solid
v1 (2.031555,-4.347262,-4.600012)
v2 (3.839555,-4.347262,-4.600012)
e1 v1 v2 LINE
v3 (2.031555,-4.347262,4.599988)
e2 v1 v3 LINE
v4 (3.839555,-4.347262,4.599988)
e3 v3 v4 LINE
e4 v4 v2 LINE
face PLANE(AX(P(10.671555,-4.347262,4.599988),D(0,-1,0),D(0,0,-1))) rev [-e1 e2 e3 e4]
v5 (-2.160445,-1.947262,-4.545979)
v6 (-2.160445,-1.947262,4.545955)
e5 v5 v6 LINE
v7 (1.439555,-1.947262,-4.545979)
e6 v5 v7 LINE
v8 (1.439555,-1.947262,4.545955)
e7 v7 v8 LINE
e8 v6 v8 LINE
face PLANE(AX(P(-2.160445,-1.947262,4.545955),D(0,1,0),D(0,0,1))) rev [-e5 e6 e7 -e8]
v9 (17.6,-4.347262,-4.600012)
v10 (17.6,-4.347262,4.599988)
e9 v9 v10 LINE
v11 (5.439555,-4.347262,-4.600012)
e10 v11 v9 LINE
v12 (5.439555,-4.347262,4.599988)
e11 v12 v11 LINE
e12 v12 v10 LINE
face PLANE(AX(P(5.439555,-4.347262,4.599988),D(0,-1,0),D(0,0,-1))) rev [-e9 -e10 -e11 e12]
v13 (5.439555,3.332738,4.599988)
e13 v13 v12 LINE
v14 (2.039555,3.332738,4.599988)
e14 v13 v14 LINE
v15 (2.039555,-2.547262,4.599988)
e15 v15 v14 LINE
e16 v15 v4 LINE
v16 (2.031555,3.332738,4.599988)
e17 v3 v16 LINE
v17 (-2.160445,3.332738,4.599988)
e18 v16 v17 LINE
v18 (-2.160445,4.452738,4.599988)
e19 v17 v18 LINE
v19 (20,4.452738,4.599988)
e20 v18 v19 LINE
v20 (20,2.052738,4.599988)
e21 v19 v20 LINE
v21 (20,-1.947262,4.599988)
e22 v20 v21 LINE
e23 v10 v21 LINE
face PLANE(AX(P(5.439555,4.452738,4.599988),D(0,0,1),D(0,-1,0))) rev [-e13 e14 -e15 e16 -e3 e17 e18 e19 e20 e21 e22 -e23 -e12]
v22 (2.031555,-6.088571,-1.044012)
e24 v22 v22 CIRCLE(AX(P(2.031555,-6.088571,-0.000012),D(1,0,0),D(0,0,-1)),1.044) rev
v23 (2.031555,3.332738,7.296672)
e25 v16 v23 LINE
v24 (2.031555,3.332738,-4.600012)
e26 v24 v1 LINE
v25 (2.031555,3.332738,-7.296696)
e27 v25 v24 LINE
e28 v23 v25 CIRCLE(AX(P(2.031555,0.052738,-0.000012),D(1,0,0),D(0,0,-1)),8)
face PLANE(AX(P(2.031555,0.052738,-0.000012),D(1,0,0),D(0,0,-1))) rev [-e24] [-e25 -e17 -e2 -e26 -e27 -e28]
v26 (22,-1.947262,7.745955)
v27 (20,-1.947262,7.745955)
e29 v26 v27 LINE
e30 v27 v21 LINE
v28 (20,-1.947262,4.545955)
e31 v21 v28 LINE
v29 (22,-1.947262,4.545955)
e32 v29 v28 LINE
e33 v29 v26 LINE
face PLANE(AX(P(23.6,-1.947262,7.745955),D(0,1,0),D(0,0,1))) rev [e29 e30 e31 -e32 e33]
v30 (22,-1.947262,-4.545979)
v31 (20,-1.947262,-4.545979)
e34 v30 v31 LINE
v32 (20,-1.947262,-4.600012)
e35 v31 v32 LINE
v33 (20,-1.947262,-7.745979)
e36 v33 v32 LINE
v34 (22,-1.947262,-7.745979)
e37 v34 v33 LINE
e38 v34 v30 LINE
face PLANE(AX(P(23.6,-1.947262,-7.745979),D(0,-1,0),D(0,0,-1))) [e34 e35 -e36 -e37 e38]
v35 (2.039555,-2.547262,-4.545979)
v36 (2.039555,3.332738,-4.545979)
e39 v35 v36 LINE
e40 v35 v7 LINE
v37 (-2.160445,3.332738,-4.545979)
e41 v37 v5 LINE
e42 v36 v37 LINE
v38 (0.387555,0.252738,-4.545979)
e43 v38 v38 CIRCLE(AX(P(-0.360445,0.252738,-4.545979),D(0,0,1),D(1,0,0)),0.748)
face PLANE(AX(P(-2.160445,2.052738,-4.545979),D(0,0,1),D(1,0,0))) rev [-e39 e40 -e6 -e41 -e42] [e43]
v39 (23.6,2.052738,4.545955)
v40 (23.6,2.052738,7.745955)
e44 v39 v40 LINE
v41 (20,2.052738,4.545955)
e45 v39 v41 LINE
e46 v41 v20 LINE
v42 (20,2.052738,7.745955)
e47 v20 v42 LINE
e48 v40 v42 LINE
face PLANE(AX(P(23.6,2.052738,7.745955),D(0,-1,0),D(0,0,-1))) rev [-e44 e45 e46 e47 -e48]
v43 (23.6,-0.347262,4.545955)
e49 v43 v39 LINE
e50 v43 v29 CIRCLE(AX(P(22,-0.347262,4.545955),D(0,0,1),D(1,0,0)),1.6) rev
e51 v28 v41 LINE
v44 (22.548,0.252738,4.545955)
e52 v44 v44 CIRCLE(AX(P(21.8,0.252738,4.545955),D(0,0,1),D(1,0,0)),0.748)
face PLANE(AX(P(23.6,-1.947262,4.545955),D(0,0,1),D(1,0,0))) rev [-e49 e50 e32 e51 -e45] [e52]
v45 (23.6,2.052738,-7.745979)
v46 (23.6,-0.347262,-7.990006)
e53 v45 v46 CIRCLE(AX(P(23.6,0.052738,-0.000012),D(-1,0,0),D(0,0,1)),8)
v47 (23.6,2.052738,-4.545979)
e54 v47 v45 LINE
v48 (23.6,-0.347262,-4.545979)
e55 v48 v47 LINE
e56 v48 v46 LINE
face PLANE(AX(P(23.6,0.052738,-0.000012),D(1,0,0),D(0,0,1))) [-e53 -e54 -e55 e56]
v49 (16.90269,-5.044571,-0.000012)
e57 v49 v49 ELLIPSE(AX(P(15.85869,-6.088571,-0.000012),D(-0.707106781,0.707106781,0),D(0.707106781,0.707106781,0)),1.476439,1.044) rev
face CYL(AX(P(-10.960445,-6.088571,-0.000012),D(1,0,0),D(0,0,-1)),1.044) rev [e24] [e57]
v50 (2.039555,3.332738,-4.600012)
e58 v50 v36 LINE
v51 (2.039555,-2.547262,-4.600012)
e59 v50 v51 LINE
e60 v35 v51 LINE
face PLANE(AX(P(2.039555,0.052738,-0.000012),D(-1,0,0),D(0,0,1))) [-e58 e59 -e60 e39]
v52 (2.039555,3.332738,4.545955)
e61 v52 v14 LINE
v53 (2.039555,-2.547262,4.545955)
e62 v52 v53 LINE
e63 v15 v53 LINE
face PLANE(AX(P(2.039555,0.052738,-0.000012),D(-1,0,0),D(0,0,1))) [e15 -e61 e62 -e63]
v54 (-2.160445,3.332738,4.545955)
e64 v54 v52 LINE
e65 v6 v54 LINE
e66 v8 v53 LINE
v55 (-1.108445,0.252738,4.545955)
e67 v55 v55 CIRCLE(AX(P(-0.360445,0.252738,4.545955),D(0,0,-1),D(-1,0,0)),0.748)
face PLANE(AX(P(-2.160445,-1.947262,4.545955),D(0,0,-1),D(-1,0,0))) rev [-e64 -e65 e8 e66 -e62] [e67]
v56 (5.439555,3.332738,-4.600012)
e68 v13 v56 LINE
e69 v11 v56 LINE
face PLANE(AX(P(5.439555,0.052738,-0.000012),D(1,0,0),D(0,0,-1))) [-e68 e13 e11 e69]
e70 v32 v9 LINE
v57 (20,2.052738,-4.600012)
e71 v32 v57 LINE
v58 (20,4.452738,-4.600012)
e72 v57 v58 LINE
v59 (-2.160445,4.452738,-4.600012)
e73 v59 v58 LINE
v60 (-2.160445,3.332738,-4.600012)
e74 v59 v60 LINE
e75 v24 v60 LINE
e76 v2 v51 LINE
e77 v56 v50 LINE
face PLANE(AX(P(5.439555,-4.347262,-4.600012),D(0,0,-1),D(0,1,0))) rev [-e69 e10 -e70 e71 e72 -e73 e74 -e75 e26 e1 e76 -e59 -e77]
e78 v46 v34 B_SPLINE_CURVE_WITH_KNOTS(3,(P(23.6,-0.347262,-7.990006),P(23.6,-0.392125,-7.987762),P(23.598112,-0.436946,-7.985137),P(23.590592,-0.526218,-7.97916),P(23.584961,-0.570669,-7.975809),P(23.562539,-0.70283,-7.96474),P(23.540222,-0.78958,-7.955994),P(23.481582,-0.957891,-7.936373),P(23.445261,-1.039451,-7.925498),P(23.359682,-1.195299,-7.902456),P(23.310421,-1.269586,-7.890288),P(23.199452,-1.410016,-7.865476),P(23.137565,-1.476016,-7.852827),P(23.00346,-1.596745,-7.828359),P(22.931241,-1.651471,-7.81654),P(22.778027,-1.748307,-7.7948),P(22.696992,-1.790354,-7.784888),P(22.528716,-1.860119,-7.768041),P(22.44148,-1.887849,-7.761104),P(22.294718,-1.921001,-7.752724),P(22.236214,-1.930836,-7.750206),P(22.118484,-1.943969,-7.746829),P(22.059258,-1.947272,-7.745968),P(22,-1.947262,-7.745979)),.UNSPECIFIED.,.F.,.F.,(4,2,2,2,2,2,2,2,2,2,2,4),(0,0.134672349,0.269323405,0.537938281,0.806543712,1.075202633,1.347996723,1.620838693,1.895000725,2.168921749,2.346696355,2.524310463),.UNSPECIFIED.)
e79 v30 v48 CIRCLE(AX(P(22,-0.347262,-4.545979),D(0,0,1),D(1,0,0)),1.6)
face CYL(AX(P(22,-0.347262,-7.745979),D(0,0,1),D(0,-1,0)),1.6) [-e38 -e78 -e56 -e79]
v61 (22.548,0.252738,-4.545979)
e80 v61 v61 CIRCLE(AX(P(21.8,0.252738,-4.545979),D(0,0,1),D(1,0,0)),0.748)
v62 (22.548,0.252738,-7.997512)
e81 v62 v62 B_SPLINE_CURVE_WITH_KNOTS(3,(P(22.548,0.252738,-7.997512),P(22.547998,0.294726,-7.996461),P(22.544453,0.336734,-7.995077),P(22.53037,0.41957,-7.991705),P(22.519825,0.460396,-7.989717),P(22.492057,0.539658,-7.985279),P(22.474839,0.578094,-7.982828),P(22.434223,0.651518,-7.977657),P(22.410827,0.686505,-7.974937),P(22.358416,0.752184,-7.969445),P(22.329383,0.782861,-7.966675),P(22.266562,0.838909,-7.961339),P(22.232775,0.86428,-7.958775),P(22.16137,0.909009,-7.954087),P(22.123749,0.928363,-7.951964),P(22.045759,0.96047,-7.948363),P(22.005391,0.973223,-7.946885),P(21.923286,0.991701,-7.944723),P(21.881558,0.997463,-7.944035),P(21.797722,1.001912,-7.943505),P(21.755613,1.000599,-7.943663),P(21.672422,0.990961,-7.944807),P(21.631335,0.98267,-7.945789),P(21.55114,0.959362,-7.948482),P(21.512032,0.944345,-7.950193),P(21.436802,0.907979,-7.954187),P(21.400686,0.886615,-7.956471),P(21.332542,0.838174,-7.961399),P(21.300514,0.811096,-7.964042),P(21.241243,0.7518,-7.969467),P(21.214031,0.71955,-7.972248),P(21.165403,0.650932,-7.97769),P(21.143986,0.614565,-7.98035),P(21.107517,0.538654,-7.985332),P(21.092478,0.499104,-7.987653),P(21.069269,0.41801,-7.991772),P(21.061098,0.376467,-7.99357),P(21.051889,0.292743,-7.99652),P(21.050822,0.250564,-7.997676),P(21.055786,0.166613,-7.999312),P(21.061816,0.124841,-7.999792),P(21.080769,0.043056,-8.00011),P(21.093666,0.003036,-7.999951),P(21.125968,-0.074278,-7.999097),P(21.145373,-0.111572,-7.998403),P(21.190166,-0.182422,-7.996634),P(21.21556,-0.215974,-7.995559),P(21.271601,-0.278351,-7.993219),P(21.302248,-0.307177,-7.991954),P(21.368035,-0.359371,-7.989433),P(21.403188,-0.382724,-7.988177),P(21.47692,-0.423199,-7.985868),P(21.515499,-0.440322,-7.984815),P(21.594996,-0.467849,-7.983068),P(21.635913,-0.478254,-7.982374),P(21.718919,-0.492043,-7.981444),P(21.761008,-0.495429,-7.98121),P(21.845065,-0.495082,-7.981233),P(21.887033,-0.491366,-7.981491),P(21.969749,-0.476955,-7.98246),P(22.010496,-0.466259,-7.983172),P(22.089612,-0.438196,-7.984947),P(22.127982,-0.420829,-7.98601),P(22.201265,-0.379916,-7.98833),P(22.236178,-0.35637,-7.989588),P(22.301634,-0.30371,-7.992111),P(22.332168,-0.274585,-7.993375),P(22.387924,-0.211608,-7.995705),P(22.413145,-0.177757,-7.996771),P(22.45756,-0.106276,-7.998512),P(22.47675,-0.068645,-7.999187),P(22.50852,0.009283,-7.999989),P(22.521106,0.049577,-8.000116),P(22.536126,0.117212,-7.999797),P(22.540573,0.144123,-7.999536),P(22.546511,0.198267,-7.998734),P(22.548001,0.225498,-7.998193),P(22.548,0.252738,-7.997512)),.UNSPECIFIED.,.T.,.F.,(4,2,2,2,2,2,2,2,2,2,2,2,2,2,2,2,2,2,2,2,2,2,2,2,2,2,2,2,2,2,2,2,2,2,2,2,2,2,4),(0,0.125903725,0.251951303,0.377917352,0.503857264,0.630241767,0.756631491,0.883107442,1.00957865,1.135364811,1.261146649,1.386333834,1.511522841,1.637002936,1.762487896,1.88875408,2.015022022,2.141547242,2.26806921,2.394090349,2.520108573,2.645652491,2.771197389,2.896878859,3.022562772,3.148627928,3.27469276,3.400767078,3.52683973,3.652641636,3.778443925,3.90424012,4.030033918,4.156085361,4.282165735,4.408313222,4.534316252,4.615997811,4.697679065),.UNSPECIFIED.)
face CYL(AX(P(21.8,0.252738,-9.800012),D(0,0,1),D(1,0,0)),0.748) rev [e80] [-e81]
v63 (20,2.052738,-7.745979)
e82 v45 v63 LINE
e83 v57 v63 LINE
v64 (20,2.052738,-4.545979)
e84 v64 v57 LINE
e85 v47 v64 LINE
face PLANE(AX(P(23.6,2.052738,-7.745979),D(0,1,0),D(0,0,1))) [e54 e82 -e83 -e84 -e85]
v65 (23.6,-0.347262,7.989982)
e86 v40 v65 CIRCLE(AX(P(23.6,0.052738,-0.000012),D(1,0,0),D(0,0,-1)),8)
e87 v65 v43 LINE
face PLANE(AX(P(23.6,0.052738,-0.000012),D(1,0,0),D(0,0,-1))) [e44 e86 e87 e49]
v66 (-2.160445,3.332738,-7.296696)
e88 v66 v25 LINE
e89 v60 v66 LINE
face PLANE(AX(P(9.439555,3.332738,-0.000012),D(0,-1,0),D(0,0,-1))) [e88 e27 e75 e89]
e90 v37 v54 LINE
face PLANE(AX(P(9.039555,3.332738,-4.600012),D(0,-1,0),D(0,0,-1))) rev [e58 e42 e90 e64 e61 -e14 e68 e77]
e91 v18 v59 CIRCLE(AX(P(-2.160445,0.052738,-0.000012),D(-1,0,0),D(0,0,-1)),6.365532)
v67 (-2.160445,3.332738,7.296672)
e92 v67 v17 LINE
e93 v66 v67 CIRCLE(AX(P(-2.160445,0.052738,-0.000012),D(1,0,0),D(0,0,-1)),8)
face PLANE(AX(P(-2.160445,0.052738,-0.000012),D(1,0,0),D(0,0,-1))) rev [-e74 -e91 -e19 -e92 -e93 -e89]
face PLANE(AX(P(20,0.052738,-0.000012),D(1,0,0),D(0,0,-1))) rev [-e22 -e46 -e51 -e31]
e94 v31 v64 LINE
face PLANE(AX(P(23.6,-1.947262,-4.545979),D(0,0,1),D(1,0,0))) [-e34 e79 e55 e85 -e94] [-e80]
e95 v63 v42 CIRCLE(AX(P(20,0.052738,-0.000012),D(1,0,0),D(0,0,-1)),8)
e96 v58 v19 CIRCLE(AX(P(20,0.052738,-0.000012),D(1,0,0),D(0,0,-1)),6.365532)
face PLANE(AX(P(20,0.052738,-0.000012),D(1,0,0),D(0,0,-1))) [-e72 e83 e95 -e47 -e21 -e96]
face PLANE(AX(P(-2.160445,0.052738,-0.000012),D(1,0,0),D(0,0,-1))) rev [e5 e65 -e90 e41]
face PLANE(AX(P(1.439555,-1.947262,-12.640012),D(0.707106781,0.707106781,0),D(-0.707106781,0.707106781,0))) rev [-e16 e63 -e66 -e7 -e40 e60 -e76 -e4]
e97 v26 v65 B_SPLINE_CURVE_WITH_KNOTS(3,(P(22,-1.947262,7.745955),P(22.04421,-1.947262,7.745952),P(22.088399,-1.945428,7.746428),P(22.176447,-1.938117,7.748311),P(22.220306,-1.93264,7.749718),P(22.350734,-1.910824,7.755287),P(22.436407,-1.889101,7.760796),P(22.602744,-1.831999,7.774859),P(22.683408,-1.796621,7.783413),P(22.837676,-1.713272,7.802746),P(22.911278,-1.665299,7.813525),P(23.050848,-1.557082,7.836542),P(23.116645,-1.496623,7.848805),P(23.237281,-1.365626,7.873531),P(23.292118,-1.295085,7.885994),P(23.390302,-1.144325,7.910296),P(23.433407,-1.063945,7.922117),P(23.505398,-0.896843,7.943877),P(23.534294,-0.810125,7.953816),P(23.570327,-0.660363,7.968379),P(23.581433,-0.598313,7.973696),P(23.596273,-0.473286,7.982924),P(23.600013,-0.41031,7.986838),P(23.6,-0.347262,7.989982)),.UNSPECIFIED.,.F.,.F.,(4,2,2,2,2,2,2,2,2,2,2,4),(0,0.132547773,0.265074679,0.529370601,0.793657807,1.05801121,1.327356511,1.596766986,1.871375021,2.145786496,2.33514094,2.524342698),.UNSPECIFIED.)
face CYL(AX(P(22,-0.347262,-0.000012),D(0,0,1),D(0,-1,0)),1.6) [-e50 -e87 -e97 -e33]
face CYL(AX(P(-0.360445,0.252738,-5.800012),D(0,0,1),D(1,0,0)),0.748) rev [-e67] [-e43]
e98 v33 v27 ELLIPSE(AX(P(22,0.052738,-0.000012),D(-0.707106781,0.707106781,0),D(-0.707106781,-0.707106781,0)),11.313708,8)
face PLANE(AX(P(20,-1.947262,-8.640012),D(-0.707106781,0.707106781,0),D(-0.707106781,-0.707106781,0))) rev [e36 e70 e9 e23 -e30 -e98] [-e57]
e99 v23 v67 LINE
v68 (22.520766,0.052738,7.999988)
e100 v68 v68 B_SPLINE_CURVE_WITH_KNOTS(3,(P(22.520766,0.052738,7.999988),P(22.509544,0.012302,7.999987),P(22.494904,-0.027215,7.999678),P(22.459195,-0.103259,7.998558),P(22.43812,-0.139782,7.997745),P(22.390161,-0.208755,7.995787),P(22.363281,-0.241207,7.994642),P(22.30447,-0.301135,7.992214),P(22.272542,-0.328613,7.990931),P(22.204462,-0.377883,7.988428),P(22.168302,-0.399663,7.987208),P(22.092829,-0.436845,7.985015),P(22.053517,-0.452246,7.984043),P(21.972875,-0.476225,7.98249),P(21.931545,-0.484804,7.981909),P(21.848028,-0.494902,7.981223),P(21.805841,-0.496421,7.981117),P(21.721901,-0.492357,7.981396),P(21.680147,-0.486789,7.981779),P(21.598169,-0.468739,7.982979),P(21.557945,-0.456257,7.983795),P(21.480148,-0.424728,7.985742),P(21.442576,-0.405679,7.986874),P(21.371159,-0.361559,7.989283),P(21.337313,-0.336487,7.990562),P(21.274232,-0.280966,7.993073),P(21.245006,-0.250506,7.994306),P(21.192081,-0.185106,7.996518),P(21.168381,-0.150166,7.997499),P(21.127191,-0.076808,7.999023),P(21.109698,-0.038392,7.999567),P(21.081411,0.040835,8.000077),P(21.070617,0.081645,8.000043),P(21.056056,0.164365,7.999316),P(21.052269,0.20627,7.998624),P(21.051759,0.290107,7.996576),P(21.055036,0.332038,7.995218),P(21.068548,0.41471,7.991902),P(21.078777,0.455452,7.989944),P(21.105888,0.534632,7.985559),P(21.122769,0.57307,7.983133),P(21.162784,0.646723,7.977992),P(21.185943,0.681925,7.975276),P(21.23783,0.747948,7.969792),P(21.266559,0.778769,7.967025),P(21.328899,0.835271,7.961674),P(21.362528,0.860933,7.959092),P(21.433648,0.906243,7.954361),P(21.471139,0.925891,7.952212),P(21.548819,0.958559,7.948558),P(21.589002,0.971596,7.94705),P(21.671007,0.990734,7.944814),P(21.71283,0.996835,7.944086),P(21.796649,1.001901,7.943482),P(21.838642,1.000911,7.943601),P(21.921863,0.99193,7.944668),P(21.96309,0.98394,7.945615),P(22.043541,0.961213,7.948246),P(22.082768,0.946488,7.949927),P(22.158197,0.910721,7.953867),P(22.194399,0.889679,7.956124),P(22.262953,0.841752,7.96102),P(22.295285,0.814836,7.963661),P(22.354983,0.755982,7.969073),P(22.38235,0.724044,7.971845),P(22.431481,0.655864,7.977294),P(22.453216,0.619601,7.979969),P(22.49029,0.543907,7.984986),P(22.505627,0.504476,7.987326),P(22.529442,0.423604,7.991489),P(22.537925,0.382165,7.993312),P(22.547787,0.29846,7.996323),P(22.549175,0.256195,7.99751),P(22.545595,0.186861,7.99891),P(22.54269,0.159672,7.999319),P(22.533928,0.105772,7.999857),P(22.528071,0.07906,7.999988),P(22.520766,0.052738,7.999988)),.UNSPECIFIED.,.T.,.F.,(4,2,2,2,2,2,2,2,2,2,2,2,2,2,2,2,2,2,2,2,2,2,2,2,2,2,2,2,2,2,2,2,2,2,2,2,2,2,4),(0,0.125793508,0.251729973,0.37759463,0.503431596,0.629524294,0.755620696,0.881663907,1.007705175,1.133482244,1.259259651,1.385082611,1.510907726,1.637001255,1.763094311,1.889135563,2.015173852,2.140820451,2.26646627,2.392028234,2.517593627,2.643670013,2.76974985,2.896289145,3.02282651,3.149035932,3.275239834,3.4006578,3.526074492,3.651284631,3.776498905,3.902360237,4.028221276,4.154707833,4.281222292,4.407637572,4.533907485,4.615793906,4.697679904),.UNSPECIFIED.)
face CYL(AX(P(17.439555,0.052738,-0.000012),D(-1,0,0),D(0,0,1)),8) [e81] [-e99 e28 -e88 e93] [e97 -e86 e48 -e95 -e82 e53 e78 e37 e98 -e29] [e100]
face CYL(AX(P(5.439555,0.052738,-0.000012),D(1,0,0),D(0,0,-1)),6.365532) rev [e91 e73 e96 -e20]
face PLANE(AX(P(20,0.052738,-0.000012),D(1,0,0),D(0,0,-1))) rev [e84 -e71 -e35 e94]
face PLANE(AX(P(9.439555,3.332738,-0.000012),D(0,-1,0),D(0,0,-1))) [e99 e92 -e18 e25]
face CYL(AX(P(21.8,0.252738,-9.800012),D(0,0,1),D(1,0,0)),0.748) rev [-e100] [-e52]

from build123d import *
from build123d.topology import SkipClean

# Parameters (mm, degrees)
SKETCH1_R           = 10
BOSS_EXTRUDE1_DEPTH = 10
SKETCH4_R           = 1.305
CUT_EXTRUDE3_DEPTH  = 25.5
BOSS_EXTRUDE2_START = 4.5
BOSS_EXTRUDE2_DEPTH = 4.5
SKETCH6_R           = 0.935
CUT_EXTRUDE4_DEPTH  = 12.25
SKETCH7_W           = 11.364916732
SKETCH7_H           = 5
BOSS_EXTRUDE3_DEPTH = 4.5
SKETCH8_R           = 0.935
CUT_EXTRUDE5_DEPTH  = 7.25
BOSS_EXTRUDE4_DEPTH = 4.5
CUT_EXTRUDE6_START  = -0.75
CUT_EXTRUDE6_DEPTH  = 0.75
SKETCH12_W          = 5.25
SKETCH12_H          = 4
CUT_EXTRUDE7_DEPTH  = 1.6
CUT_EXTRUDE8_DEPTH  = 15.8
FILLET1_R           = 2
CUT_EXTRUDE9_DEPTH  = 10.8
SKETCH15_W          = 11.364916732
SKETCH15_H          = 6.6
CUT_EXTRUDE10_DEPTH = 1.6
CUT_EXTRUDE11_DEPTH = 15
BOSS_EXTRUDE5_REACH = 35.438
SKETCH17_R          = 10
SKETCH17_R_2        = 1.305
CUT_EXTRUDE12_DEPTH = 14
SCALE1_SCALE        = 0.8


with BuildPart() as part:
    # Sketch1 → Boss-Extrude1 (new, symmetric)
    with BuildSketch(Plane(origin=(0, 0, 0), x_dir=(0, 0, -1), z_dir=(1, 0, 0))):
        Circle(SKETCH1_R)
    extrude(amount=BOSS_EXTRUDE1_DEPTH, both=True)

    # Sketch4 → Cut-Extrude3 (cut, symmetric)
    with BuildSketch(Plane(origin=(0, -0.76336978, 0), x_dir=(0, 0, -1), z_dir=(1, 0, 0))):
        with Locations((0, -6.913267104)):
            Circle(SKETCH4_R)
    extrude(amount=CUT_EXTRUDE3_DEPTH, both=True, mode=Mode.SUBTRACT)

    # Sketch5 → Boss-Extrude2 (add)
    with BuildSketch(Plane(origin=(10, 0, 0), x_dir=(0, 0, -1), z_dir=(1, 0, 0)).offset(BOSS_EXTRUDE2_START)):
        with BuildLine():
            Line((-9.682458366, -2.5), (-5.682458366, -2.5))
            Line((-5.682458366, -2.5), (-5.682458366, 2.5))
            Line((-5.682458366, 2.5), (-9.682458366, 2.5))
            ThreePointArc((-9.682458366, 2.5), (-10, 0), (-9.682458366, -2.5))
        make_face()
    boss_extrude2 = extrude(amount=-BOSS_EXTRUDE2_DEPTH)

    # Mirror1: Boss-Extrude2 across plane
    add(boss_extrude2.mirror(Plane.XY))

    # Sketch6 → Cut-Extrude4 (cut, symmetric)
    with SkipClean():  # the faces are left unmerged after this step: merging them gives an invalid solid
        with BuildSketch(Plane.XY):
            with Locations((12.25, 0.25)):
                Circle(SKETCH6_R)
        extrude(amount=CUT_EXTRUDE4_DEPTH, both=True, mode=Mode.SUBTRACT)

    # Sketch7 → Boss-Extrude3 (add)
    with SkipClean():  # the faces are left unmerged after this step: merging them gives an invalid solid
        with BuildSketch(Plane.ZY.offset(10)):
            Rectangle(SKETCH7_W, SKETCH7_H)
        extrude(amount=BOSS_EXTRUDE3_DEPTH)

    # Sketch8 → Cut-Extrude5 (cut, symmetric)
    with SkipClean():  # the faces are left unmerged after this step: merging them gives an invalid solid
        with BuildSketch(Plane.XY):
            with Locations((-12.25, 0.25)):
                Circle(SKETCH8_R)
        extrude(amount=CUT_EXTRUDE5_DEPTH, both=True, mode=Mode.SUBTRACT)

    # Sketch10 → Boss-Extrude4 (add)
    with SkipClean():  # the faces are left unmerged after this step: merging them gives an invalid solid
        with BuildSketch(Plane.ZY.offset(10)):
            with BuildLine():
                Line((9.682458366, 2.5), (-9.682458366, 2.5))
                ThreePointArc((-9.682458366, 2.5), (0, 10), (9.682458366, 2.5))
            make_face()
        extrude(amount=BOSS_EXTRUDE4_DEPTH)

    # Cut-Extrude6: read off the stored shape, not the designer's step
    # Cut-Extrude6 outline → Cut-Extrude6 (cut)
    with SkipClean():  # the faces are left unmerged after this step: merging them gives an invalid solid
        with BuildSketch(Plane.ZY.offset(10).offset(CUT_EXTRUDE6_START)):
            with BuildLine():
                ThreePointArc((-9.682458366, 2.5), (-9.369942303, -3.493448331), (-5.682458366, -8.228588392))
                Line((-5.682458366, -8.228588392), (-5.682458366, 2.5))
                Line((-5.682458366, 2.5), (-9.682458366, 2.5))
            make_face()
            with BuildLine():
                Line((5.682458366, 2.5), (5.682458366, -8.228588392))
                ThreePointArc((5.682458366, -8.228588392), (9.369942303, -3.493448331), (9.682458366, 2.5))
                Line((9.682458366, 2.5), (5.682458366, 2.5))
            make_face()
        extrude(amount=CUT_EXTRUDE6_DEPTH, mode=Mode.SUBTRACT)

    # Sketch12 → Cut-Extrude7 (cut)
    with SkipClean():  # the faces are left unmerged after this step: merging them gives an invalid solid
        with BuildSketch(Plane.XZ.offset(-2.5)):
            with Locations((-11.875, -7.682458366)):
                Rectangle(SKETCH12_W, SKETCH12_H)
            with Locations((-11.875, 7.682458366)):
                Rectangle(SKETCH12_W, SKETCH12_H)
        extrude(amount=-CUT_EXTRUDE7_DEPTH, mode=Mode.SUBTRACT)

    # Sketch13 → Cut-Extrude8 (cut, symmetric)
    with SkipClean():  # the faces are left unmerged after this step: merging them gives an invalid solid
        with BuildSketch(Plane.XY):
            Polygon((-10, -8.228588392), (-10, -2.5), (-2.5, -10), (-10, -10), align=None)
        extrude(amount=CUT_EXTRUDE8_DEPTH, both=True, mode=Mode.SUBTRACT)

    # Fillet1
    fillet1_edges = [part.edges().sort_by_distance(p)[0] for p in [
        (14.5, -2.5, 7.682458366),
        (14.5, -2.5, -7.682458366),
    ]]
    fillet(fillet1_edges, radius=FILLET1_R)

    # Sketch14 → Cut-Extrude9 (cut, symmetric)
    with SkipClean():  # the faces are left unmerged after this step: merging them gives an invalid solid
        with BuildSketch(Plane.XY):
            Polygon((10, -10), (10, -2.5), (2.5, -10), align=None)
        extrude(amount=CUT_EXTRUDE9_DEPTH, both=True, mode=Mode.SUBTRACT)

    # Sketch15 → Cut-Extrude10 (cut)
    with SkipClean():  # the faces are left unmerged after this step: merging them gives an invalid solid
        with BuildSketch(Plane(origin=(10, 0, 0), x_dir=(0, 0, -1), z_dir=(1, 0, 0))):
            with Locations((0, -0.8)):
                Rectangle(SKETCH15_W, SKETCH15_H)
        extrude(amount=-CUT_EXTRUDE10_DEPTH, mode=Mode.SUBTRACT)

    # Sketch16 → Cut-Extrude11 (cut)
    with SkipClean():  # the faces are left unmerged after this step: merging them gives an invalid solid
        with BuildSketch(Plane(origin=(10, 0, 0), x_dir=(0, 0, -1), z_dir=(1, 0, 0))):
            with BuildLine():
                Line((-5.75, 5.5), (-5.75, -5.5))
                Line((-5.75, -5.5), (5.75, -5.5))
                Line((5.75, -5.5), (5.75, 5.5))
                ThreePointArc((5.75, 5.5), (0, 7.956915231), (-5.75, 5.5))
            make_face()
        extrude(amount=-CUT_EXTRUDE11_DEPTH, mode=Mode.SUBTRACT)


with BuildPart() as body_2:
    # Split1: the piece on the far side of the plane
    add(part.part)
    split(bisect_by=Plane(origin=(0, 0, 0), x_dir=(0, 0, 1), z_dir=(1, 0, 0)), keep=Keep.BOTTOM)


with BuildPart() as part_1:
    add(part.part)

    # Split1
    split(bisect_by=Plane(origin=(0, 0, 0), x_dir=(0, 0, 1), z_dir=(1, 0, 0)), keep=Keep.TOP)


with BuildPart() as part_2:
    # Body-Move/Copy1: moved
    add(part_1.part.moved(Location((15.8, 0, 0))))


    # Sketch17 → Boss-Extrude5 (add, up to next)
    with BuildSketch(Plane.ZY.offset(-15.8), mode=Mode.PRIVATE) as boss_extrude5_sk1:
        with Locations(Location((0, 0, 0), (0, 0, 357.134016017))):
            Circle(SKETCH17_R)
        with Locations(Location((0, -7.676636884, 0), (0, 0, 180))):
            Circle(SKETCH17_R_2, mode=Mode.SUBTRACT)
        with BuildLine():
            Line((-5.75, -5.5), (5.75, -5.5))
            Line((5.75, -5.5), (5.75, 5.5))
            ThreePointArc((5.75, 5.5), (0, 7.956915231), (-5.75, 5.5))
            Line((-5.75, 5.5), (-5.75, -5.5))
        make_face(mode=Mode.SUBTRACT)
    boss_extrude5_tool1 = extrude(boss_extrude5_sk1.sketch, amount=BOSS_EXTRUDE5_REACH, mode=Mode.PRIVATE) - body_2.part
    add(boss_extrude5_tool1.solids().sort_by_distance((15.8, 0.485858, -9.705003))[0])


with BuildPart() as body_2_1:
    # Body-Move/Copy2: moved
    add(body_2.part.moved(Location((9.26, 0, 0))))

    # Combine4: union part
    add(part_2.part)

    # Sketch18 → Cut-Extrude12 (cut)
    with SkipClean():  # the faces are left unmerged after this step: merging them gives an invalid solid
        with BuildSketch(Plane.ZY.offset(5.24)):
            with BuildLine():
                Line((-5.75, 5.5), (-5.75, 4.1))
                Line((-5.75, 4.1), (5.75, 4.1))
                Line((5.75, 4.1), (5.75, 5.5))
                ThreePointArc((5.75, 5.5), (0, 7.956915231), (-5.75, 5.5))
            make_face()
        extrude(amount=-CUT_EXTRUDE12_DEPTH, mode=Mode.SUBTRACT)


with BuildPart() as body_2_2:
    # Scale1: scaled about (10.157754057, 0.26372377, 1.86e-07)
    add(body_2_1.part.scale(SCALE1_SCALE).moved(Location((2.031550811, 0.052744754, 3.7e-08))))


with BuildPart() as body_2_2_1:
    # Split2: the piece on the far side of the plane
    add(body_2_2.part)
    split(bisect_by=Plane(origin=(10, 0, 0), x_dir=(0, 0, 1), z_dir=(1, 0, 0)), keep=Keep.BOTTOM)


with BuildPart() as body_2_3:
    add(body_2_2.part)

    # Split2
    split(bisect_by=Plane(origin=(10, 0, 0), x_dir=(0, 0, 1), z_dir=(1, 0, 0)), keep=Keep.TOP)


with BuildPart() as body_2_4:
    # Body-Move/Copy3: read off the stored shape, not the designer's step
    # Body-Move/Copy3: moved
    add(body_2_3.part.moved(Location((-2.6715551, 0, 0))))


with BuildPart() as body_2_2_2:
    add(body_2_2_1.part)

    # Combine5: union body 2
    add(body_2_4.part)


solid = body_2_2_2.part
